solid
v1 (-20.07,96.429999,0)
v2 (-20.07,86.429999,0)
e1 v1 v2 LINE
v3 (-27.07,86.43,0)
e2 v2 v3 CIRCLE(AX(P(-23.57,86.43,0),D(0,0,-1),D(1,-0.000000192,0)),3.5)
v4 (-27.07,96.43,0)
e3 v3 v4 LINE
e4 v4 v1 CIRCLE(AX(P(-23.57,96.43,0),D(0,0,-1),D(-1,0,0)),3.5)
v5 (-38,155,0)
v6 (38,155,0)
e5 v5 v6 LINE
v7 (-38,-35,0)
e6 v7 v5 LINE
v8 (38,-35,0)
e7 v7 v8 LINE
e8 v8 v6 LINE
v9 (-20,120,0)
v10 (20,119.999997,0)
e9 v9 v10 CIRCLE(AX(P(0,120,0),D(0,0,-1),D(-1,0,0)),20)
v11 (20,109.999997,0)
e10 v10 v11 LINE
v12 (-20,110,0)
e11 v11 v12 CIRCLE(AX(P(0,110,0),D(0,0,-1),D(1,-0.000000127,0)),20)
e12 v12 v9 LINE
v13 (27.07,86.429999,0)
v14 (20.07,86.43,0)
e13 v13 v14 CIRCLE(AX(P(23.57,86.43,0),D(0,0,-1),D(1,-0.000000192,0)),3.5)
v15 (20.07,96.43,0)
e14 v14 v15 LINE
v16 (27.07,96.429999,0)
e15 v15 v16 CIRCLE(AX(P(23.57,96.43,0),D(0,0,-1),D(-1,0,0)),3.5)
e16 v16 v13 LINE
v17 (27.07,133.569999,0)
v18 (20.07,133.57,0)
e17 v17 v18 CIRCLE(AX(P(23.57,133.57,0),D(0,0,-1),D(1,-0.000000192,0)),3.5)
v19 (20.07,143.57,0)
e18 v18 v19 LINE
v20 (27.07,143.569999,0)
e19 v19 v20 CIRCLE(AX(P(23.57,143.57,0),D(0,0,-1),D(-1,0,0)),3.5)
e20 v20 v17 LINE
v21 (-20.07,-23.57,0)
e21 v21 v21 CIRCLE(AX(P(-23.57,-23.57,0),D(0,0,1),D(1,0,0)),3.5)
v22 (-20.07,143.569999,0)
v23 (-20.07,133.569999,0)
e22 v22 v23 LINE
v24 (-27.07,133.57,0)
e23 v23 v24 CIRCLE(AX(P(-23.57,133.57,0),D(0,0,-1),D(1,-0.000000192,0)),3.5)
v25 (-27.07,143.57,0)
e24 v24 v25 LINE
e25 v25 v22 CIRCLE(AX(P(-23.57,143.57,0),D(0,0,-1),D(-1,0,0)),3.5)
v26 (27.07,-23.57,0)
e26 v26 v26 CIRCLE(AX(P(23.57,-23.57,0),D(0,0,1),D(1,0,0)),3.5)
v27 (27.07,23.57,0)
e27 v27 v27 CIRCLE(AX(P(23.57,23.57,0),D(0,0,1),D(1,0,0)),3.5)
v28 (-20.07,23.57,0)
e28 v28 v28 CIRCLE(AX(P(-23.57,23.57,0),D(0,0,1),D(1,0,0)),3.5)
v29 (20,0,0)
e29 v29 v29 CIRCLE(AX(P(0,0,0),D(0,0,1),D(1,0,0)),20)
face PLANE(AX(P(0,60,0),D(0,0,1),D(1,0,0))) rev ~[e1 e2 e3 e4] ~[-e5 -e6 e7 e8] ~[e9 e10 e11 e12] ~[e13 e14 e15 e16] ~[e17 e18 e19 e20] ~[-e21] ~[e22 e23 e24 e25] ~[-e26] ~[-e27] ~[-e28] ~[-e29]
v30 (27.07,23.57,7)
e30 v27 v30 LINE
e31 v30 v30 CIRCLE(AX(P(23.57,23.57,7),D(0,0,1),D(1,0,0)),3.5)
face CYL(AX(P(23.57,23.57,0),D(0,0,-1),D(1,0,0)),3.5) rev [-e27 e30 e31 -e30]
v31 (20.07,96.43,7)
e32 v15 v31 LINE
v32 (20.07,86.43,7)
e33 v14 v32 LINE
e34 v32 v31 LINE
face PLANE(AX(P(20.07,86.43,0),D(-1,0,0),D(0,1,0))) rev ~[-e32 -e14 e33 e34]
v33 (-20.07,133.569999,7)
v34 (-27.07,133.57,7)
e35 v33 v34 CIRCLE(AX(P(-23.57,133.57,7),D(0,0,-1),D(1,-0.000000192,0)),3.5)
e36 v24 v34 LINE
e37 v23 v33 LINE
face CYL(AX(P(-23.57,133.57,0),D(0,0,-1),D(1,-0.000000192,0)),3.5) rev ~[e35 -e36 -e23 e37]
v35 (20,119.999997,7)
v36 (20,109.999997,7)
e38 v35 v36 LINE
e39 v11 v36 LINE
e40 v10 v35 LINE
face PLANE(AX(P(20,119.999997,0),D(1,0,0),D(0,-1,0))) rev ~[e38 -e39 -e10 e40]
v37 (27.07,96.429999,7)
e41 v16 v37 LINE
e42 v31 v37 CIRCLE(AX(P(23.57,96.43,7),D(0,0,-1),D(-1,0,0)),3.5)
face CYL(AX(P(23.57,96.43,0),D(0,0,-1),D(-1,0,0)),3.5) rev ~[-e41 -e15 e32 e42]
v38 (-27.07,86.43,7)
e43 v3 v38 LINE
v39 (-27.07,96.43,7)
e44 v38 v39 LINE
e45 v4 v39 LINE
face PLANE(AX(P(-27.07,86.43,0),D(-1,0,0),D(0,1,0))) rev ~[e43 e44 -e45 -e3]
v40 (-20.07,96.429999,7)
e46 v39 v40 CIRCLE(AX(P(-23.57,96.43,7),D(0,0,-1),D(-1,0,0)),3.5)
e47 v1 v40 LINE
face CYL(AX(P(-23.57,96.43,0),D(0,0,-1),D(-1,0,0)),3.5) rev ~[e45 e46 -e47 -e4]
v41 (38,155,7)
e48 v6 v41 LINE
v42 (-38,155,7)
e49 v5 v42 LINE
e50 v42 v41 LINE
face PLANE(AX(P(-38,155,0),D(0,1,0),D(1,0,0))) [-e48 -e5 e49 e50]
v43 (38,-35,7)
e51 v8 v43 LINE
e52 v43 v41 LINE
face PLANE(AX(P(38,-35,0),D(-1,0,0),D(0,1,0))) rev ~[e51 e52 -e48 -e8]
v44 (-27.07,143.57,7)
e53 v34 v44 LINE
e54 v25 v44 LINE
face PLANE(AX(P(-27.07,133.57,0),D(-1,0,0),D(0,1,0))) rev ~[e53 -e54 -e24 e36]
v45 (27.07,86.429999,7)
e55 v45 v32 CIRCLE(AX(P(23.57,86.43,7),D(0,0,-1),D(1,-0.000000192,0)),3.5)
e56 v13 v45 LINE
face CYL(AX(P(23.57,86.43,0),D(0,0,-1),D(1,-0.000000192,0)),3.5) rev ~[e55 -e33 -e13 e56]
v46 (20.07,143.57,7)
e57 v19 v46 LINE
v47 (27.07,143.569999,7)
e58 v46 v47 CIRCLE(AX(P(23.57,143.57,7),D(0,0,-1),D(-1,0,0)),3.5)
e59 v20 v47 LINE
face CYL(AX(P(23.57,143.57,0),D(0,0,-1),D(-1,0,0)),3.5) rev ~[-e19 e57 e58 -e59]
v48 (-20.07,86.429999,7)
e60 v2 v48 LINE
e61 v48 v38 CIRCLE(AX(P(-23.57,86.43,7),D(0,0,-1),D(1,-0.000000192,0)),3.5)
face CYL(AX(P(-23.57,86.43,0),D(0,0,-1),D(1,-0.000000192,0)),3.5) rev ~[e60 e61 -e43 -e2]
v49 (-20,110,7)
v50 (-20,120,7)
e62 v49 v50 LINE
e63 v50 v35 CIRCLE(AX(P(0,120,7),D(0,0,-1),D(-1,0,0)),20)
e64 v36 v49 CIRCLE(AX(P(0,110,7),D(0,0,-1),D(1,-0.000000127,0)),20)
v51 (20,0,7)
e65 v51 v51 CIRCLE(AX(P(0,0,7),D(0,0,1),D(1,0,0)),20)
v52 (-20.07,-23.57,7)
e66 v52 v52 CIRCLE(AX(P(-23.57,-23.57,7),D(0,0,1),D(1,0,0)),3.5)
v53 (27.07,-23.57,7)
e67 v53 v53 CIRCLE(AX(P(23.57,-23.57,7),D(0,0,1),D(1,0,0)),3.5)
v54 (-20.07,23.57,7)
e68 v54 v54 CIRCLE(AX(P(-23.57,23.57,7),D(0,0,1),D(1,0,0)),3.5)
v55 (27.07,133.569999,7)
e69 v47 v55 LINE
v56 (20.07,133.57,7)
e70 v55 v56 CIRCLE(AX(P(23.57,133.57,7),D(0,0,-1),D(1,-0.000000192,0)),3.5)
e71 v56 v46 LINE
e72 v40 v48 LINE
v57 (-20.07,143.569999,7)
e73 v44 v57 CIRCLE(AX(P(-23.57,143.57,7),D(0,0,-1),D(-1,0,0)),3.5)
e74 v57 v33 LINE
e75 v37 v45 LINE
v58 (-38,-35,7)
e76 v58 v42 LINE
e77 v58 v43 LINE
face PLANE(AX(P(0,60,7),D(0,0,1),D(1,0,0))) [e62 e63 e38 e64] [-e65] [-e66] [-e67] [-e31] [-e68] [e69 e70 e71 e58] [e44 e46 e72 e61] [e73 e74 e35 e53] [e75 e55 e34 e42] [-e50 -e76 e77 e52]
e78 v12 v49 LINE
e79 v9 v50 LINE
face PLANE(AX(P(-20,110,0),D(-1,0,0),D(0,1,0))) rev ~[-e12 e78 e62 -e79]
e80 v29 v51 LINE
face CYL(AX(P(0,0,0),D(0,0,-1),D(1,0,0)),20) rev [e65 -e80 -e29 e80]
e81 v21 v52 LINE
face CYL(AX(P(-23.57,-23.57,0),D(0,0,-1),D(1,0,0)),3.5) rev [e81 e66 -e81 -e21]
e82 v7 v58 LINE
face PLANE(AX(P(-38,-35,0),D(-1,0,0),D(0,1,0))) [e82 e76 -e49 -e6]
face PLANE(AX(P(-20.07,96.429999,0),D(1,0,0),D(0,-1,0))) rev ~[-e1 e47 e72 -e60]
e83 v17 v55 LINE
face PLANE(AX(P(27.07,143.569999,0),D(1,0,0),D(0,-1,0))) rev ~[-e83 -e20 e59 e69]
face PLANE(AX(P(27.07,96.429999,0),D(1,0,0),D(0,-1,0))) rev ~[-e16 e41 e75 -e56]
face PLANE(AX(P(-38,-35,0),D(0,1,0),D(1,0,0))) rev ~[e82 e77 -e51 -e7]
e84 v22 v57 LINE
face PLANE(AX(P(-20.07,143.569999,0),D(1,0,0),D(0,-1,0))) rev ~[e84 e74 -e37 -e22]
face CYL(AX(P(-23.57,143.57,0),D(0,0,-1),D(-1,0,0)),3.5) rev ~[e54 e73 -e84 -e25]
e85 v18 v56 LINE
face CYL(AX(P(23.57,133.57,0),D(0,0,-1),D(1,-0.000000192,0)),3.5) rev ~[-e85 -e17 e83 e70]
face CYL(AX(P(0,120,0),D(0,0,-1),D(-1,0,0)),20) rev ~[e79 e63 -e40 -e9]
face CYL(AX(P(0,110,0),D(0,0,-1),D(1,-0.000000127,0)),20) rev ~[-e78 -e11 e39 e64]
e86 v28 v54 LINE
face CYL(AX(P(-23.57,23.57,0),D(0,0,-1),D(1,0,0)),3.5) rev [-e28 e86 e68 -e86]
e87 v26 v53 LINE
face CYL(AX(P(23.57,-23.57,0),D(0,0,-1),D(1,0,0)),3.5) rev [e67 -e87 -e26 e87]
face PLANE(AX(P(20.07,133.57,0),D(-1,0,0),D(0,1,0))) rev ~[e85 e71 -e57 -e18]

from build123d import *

# Parameters (mm, degrees)
F0_W     = 76
F0_H     = 190
F0_R     = 3.5
F0_R_2   = 20
F1_DEPTH = 7


# Not quite as in the source:
# - a feature names something its author has since deleted; it is built from what else it names


with BuildPart() as f1:
    # F0 (on Top) → F1 (new body)
    with BuildSketch(Plane.XY):
        with Locations((0, 60)):
            Rectangle(F0_W, F0_H)
        with Locations((-23.57, -23.57)):
            Circle(F0_R, mode=Mode.SUBTRACT)
        with Locations((-23.57, 23.57)):
            Circle(F0_R, mode=Mode.SUBTRACT)
        Circle(F0_R_2, mode=Mode.SUBTRACT)
        with Locations((23.57, -23.57)):
            Circle(F0_R, mode=Mode.SUBTRACT)
        with Locations((23.57, 23.57)):
            Circle(F0_R, mode=Mode.SUBTRACT)
        with BuildLine():
            Line((-27.07, 86.43), (-27.07, 96.43))
            ThreePointArc((-27.07, 96.43), (-23.5699996641, 99.93), (-20.07, 96.4299993282))
            Line((-20.07, 96.4299993282), (-20.07, 86.4299993282))
            ThreePointArc((-20.07, 86.4299993282), (-23.5700003359, 82.93), (-27.07, 86.43))
        make_face(mode=Mode.SUBTRACT)
        with BuildLine():
            Line((-27.07, 133.57), (-27.07, 143.57))
            ThreePointArc((-27.07, 143.57), (-23.5699996641, 147.07), (-20.07, 143.5699993282))
            Line((-20.07, 143.5699993282), (-20.07, 133.5699993282))
            ThreePointArc((-20.07, 133.5699993282), (-23.5700003359, 130.07), (-27.07, 133.57))
        make_face(mode=Mode.SUBTRACT)
        with BuildLine():
            Line((20.07, 86.43), (20.07, 96.43))
            ThreePointArc((20.07, 96.43), (23.5700003359, 99.93), (27.07, 96.4299993282))
            Line((27.07, 96.4299993282), (27.07, 86.4299993282))
            ThreePointArc((27.07, 86.4299993282), (23.5699996641, 82.93), (20.07, 86.43))
        make_face(mode=Mode.SUBTRACT)
        with BuildLine():
            Line((-20, 110), (-20, 120))
            ThreePointArc((-20, 120), (1.2657e-06, 140), (20, 119.9999974687))
            Line((20, 119.9999974687), (20, 109.9999974687))
            ThreePointArc((20, 109.9999974687), (-1.2657e-06, 90), (-20, 110))
        make_face(mode=Mode.SUBTRACT)
        with BuildLine():
            Line((20.07, 133.57), (20.07, 143.57))
            ThreePointArc((20.07, 143.57), (23.5700003359, 147.07), (27.07, 143.5699993282))
            Line((27.07, 143.5699993282), (27.07, 133.5699993282))
            ThreePointArc((27.07, 133.5699993282), (23.5699996641, 130.07), (20.07, 133.57))
        make_face(mode=Mode.SUBTRACT)
    extrude(amount=F1_DEPTH)


solid = f1.part
